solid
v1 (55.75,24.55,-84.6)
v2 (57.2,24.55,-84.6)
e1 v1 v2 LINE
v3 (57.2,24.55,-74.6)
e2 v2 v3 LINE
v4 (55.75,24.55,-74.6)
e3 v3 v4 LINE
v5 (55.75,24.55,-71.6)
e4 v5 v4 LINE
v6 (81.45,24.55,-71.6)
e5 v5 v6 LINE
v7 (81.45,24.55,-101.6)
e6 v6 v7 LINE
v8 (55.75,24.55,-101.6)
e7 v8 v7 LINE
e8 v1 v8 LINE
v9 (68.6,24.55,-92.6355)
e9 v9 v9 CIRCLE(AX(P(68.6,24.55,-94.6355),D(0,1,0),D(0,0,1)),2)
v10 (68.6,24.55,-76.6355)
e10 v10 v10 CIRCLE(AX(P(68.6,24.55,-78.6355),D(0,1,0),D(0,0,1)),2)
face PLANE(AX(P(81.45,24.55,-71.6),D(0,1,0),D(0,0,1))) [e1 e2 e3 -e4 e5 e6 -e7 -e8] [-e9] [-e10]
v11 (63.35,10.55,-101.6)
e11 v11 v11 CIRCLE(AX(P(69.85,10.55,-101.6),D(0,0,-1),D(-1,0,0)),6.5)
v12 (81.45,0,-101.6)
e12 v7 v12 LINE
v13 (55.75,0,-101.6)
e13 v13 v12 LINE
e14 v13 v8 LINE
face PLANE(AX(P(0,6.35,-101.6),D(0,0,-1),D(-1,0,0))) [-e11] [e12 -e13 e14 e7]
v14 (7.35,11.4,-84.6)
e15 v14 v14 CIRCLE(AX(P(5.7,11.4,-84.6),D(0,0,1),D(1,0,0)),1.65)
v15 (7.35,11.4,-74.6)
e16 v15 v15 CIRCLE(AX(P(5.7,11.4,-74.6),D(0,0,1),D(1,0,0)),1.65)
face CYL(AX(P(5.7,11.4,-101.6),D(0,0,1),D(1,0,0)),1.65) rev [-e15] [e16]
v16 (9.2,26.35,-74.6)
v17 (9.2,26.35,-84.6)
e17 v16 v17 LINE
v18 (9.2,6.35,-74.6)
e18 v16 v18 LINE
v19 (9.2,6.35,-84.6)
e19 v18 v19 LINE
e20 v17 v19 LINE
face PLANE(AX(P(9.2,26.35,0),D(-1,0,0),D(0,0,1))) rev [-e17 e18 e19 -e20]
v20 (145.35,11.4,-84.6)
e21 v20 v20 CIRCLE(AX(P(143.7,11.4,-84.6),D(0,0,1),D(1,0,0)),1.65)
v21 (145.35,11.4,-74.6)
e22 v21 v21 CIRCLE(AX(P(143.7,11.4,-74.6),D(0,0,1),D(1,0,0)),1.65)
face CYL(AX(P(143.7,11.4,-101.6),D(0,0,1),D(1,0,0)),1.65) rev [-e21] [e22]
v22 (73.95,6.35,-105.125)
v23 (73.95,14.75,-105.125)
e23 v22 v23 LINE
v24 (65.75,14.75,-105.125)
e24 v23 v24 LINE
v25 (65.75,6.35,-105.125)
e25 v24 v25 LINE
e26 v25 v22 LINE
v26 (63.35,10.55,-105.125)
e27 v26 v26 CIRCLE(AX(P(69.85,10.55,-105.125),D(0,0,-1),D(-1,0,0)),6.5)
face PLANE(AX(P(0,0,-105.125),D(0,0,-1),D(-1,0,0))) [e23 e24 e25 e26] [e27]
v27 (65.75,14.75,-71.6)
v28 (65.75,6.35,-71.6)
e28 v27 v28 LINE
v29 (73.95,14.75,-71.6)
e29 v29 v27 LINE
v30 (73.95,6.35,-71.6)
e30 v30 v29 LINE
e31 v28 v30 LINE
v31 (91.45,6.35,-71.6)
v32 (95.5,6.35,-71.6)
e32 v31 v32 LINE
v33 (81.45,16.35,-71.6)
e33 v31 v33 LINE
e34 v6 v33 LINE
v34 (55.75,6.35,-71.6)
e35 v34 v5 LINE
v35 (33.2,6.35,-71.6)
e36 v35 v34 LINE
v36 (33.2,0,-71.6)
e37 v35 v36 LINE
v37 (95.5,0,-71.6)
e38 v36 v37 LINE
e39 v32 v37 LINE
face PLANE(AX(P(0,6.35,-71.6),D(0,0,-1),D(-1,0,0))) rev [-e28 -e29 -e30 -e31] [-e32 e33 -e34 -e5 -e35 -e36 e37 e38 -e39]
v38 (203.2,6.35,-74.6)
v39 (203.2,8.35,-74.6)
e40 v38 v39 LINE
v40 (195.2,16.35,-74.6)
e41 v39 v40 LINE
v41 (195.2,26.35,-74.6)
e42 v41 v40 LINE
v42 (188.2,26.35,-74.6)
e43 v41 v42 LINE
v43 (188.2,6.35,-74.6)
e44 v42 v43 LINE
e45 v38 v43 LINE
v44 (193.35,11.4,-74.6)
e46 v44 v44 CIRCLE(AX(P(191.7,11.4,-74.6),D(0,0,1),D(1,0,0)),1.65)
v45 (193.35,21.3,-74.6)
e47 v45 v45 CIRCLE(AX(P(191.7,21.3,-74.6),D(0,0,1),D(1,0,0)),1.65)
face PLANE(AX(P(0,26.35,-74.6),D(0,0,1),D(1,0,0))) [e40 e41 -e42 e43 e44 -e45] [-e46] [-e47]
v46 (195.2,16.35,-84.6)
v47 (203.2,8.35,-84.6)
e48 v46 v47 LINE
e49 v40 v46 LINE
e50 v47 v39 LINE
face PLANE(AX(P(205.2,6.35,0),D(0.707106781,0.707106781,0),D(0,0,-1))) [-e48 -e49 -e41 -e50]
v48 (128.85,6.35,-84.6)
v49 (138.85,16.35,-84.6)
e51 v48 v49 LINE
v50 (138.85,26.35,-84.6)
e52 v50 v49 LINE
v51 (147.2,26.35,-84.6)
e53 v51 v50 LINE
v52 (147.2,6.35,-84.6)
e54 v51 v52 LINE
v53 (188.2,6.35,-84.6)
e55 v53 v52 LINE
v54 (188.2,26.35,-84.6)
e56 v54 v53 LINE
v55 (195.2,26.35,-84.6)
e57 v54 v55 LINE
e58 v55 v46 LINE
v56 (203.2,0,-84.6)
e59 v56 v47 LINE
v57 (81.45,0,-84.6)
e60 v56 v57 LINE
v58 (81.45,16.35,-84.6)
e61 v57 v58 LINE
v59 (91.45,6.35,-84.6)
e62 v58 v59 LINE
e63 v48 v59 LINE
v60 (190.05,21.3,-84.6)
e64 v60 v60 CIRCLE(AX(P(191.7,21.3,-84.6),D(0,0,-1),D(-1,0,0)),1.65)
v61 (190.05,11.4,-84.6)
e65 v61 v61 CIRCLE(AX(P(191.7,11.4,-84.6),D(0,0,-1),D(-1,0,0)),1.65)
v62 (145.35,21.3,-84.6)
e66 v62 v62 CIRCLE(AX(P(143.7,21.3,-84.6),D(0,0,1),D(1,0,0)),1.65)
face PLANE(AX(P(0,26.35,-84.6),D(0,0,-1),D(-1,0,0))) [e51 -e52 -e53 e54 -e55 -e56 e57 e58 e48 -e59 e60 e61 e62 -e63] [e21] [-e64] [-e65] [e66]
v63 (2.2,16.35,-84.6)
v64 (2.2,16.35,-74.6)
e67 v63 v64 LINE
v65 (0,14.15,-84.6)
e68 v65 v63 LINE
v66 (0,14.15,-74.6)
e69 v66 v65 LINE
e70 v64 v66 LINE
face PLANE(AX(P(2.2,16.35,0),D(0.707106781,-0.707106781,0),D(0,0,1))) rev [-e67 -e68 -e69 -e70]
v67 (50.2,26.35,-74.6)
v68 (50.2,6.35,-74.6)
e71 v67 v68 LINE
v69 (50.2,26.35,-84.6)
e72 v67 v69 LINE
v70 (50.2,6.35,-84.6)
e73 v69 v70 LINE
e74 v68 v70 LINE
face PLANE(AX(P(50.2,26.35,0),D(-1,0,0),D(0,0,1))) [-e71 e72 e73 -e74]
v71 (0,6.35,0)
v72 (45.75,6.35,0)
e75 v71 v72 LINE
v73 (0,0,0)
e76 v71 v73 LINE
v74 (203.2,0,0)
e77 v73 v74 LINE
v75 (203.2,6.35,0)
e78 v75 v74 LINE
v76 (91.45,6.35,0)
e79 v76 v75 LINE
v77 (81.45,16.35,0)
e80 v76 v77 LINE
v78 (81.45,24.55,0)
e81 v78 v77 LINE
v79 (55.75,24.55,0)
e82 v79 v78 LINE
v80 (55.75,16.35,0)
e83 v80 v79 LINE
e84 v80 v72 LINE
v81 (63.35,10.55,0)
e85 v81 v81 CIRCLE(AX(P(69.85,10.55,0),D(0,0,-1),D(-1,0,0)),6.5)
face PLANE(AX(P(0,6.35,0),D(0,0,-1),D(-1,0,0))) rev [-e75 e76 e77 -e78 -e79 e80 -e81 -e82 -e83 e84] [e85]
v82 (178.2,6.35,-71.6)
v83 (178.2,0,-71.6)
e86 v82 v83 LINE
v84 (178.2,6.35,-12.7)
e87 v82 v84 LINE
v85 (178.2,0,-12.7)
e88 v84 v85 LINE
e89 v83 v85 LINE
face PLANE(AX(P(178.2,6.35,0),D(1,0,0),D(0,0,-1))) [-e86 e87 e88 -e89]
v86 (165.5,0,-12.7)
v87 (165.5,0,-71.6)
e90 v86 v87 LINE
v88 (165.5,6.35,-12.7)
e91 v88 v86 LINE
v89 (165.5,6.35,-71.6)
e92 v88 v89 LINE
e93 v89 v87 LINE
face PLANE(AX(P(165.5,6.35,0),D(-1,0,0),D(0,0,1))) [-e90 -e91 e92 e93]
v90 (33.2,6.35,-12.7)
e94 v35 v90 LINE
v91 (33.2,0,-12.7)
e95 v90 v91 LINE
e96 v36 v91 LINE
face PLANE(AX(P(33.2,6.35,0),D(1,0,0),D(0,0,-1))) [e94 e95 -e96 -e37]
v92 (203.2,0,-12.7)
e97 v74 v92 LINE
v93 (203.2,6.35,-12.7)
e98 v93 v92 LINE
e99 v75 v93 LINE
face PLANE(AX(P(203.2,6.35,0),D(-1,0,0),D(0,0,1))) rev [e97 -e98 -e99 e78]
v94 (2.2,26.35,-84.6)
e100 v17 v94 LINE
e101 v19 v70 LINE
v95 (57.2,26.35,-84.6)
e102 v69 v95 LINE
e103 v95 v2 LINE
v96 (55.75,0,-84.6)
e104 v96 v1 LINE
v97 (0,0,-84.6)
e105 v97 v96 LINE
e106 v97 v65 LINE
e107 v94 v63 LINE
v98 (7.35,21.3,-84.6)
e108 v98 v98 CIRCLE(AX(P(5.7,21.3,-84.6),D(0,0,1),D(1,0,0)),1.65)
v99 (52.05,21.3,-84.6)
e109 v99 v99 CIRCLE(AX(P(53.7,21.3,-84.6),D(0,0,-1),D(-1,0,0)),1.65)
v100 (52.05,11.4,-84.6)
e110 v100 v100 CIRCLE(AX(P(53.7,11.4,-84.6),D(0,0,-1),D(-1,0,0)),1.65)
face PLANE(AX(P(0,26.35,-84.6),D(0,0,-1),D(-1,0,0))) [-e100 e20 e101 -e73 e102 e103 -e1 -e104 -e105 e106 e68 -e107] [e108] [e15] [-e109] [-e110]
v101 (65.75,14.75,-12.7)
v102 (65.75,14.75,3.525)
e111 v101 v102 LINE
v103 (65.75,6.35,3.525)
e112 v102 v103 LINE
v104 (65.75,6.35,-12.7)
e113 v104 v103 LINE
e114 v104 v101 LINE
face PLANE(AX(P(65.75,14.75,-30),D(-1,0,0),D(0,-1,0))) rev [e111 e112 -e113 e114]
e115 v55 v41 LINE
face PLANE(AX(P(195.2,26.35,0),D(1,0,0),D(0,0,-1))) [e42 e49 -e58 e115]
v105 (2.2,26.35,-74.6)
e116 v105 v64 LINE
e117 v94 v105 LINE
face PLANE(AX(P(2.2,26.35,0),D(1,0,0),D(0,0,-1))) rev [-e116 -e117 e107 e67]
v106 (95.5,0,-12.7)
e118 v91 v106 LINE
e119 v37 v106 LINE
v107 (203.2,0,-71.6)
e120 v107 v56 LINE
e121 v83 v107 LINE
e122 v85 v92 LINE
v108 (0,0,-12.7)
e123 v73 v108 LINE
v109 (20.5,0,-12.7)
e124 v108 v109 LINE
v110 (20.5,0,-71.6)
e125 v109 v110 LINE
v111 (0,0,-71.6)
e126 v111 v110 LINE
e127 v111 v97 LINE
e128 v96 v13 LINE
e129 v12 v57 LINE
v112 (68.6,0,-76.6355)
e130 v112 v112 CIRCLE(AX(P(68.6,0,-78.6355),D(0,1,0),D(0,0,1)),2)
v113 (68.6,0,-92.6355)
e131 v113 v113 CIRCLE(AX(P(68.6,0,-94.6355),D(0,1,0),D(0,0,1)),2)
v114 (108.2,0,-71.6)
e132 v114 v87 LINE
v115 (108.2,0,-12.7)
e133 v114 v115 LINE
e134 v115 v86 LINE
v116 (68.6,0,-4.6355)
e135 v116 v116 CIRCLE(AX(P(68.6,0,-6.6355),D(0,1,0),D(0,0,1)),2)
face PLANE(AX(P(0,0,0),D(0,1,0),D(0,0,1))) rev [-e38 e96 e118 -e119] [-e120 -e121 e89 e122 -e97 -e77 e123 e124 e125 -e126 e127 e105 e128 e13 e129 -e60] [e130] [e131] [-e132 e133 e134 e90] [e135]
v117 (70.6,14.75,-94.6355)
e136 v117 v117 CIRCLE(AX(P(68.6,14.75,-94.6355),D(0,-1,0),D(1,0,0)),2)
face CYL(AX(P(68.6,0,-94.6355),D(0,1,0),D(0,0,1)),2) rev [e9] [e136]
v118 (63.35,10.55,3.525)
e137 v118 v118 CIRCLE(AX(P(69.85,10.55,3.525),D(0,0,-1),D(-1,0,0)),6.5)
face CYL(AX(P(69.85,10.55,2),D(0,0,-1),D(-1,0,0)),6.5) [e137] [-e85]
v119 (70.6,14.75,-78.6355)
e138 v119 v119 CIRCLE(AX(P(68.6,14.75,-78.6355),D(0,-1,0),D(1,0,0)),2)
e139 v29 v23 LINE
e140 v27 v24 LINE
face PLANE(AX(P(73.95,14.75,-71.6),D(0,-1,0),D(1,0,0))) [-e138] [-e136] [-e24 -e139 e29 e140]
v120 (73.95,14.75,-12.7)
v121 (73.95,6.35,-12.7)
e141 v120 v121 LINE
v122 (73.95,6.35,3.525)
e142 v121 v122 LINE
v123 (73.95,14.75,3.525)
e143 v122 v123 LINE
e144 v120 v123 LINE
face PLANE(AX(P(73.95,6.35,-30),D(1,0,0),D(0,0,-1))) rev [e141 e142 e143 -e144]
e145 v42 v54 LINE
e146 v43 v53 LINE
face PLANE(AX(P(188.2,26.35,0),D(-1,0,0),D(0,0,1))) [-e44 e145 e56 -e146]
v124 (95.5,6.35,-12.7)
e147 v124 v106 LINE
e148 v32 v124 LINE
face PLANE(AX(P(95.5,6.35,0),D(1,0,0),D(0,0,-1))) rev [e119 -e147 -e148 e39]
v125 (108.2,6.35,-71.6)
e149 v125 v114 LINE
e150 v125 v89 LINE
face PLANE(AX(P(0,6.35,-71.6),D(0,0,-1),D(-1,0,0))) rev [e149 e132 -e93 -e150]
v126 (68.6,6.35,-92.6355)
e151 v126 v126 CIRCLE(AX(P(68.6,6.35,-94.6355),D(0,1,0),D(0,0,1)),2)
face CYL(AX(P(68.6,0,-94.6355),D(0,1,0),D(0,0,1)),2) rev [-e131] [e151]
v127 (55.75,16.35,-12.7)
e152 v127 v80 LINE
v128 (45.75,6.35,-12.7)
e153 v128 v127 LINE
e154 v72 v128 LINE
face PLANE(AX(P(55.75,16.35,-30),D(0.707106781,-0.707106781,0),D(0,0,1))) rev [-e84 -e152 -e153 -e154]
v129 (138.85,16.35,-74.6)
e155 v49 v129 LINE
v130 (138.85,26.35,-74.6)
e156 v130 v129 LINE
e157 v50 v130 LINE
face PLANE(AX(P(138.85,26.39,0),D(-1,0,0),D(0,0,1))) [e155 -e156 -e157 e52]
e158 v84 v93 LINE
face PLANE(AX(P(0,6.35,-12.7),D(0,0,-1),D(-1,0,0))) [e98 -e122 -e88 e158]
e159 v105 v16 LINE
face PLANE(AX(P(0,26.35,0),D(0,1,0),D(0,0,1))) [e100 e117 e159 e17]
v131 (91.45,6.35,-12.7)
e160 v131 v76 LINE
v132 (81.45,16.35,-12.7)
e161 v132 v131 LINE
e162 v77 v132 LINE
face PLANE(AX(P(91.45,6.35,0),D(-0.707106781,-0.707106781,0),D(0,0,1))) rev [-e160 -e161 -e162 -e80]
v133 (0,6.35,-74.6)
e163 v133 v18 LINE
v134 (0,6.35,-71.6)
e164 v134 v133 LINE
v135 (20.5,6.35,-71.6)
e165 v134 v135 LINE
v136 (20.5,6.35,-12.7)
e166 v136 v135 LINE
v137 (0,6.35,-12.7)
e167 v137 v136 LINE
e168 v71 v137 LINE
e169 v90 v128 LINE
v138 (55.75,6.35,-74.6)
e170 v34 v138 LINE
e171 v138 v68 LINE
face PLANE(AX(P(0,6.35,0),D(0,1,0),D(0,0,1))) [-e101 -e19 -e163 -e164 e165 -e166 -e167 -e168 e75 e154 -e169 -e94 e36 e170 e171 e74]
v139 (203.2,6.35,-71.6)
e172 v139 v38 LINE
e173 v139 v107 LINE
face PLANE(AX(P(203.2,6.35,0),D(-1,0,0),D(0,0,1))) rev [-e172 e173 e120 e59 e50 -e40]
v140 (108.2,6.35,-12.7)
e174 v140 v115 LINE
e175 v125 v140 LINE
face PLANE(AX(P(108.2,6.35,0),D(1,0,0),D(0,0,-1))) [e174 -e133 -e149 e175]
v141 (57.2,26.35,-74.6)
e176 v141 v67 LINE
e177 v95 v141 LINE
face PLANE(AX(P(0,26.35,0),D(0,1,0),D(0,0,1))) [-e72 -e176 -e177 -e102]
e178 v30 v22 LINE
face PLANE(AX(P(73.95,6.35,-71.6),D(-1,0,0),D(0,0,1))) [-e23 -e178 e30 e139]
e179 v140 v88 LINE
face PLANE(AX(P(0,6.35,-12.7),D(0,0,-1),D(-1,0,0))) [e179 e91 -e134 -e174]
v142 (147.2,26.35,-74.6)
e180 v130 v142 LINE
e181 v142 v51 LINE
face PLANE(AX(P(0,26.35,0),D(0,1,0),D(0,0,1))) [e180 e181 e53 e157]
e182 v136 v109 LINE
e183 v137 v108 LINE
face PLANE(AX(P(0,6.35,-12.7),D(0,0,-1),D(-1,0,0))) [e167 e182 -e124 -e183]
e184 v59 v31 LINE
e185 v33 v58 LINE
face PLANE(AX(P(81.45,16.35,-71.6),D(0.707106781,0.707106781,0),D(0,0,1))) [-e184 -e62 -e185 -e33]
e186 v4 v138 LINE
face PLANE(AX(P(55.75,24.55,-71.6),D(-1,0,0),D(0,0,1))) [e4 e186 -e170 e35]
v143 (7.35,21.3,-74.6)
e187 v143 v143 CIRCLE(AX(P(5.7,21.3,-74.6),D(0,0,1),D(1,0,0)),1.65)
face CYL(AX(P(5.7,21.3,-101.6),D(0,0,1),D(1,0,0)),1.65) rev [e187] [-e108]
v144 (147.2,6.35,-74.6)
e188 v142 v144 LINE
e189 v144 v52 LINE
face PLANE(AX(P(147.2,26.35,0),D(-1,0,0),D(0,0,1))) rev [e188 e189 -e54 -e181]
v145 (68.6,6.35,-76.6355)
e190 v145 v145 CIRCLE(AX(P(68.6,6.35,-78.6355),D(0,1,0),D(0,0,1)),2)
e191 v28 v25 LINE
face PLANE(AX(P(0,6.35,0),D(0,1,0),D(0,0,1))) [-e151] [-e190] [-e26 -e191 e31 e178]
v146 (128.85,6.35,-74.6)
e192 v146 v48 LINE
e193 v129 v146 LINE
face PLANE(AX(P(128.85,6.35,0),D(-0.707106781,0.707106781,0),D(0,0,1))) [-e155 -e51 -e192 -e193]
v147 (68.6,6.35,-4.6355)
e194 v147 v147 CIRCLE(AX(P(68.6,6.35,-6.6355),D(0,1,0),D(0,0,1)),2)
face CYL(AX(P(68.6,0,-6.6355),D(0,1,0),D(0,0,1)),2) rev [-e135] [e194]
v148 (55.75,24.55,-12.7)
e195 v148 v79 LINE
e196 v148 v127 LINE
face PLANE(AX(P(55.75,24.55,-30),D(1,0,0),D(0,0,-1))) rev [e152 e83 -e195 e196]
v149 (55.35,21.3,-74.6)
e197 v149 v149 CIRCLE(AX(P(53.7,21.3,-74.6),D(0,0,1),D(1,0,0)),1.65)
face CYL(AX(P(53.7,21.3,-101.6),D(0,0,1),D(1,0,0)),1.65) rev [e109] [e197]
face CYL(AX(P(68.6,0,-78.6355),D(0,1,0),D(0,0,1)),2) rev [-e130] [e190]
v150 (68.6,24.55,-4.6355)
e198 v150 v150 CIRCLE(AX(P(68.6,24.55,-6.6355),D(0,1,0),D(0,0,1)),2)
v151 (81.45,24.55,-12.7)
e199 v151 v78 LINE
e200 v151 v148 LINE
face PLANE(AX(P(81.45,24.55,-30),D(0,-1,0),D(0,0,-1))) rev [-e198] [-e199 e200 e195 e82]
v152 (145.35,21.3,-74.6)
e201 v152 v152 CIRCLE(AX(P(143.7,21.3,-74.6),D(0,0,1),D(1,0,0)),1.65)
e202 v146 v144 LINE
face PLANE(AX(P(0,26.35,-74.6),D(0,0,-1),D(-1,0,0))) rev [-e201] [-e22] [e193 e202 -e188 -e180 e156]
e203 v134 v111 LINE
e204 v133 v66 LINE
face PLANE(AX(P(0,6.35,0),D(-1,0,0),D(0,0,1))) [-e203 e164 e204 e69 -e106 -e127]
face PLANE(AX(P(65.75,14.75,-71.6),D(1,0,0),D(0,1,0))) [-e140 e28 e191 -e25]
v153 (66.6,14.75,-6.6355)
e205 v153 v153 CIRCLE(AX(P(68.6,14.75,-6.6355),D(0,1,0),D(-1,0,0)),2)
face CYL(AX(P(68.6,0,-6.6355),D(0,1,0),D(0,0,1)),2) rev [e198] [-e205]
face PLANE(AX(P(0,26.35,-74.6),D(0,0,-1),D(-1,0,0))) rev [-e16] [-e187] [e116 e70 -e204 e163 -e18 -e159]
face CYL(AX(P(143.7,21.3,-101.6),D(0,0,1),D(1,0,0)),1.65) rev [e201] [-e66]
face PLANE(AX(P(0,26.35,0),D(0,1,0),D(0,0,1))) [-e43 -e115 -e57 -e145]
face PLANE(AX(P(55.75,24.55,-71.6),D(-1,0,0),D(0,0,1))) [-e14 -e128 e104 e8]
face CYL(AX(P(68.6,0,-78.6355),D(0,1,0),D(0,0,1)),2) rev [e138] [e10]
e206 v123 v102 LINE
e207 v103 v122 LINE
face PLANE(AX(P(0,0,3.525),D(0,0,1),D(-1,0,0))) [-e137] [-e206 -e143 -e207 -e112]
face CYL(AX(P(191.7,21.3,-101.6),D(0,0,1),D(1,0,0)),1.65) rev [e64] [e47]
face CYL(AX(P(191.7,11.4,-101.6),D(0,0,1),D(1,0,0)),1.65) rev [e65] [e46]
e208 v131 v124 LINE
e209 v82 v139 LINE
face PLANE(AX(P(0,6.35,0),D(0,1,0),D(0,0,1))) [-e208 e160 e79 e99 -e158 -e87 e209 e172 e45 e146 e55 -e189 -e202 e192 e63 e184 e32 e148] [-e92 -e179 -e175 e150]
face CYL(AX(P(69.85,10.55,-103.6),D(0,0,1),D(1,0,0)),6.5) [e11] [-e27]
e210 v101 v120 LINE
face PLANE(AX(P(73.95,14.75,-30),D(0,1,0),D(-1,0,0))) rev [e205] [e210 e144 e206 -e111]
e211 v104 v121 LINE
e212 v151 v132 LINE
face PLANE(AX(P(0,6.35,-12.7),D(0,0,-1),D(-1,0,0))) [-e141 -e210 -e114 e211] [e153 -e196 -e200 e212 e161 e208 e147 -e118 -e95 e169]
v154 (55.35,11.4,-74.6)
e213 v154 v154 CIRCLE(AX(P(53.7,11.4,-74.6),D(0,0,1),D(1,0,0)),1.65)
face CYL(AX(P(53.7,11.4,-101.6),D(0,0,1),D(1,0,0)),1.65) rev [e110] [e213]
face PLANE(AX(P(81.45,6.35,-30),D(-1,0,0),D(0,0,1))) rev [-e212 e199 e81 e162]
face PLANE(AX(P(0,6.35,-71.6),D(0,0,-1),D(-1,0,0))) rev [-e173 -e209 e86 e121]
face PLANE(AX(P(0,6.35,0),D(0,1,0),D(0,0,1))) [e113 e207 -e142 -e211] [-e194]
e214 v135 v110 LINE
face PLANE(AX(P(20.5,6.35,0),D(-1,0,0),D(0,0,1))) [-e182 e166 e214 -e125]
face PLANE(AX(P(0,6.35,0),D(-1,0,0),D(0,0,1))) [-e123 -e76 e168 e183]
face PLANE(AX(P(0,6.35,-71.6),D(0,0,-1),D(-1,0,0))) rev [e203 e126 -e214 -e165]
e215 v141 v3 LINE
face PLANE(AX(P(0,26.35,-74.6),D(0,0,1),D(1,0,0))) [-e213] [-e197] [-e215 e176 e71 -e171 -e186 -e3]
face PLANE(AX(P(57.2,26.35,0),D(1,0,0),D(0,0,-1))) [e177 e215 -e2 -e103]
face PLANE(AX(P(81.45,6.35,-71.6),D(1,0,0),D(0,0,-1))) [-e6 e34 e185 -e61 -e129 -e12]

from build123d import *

# Parameters (mm, degrees)
SKETCH1_W           = 12.7
SKETCH1_H           = 58.9
BOSS_EXTRUDE1_DEPTH = 6.35
SKETCH6_W           = 16.7
SKETCH6_H           = 10
SKETCH6_W_2         = 7
SKETCH6_W_3         = 8.35
BOSS_EXTRUDE5_DEPTH = 20
FILLET6_SIZE        = 8
FILLET6_SIZE_2      = 20
SKETCH7_R           = 1.65
CUT_EXTRUDE1_DEPTH  = 219.058988591
BOSS_EXTRUDE6_DEPTH = 30
SKETCH10_W          = 25.7
SKETCH10_H          = 17.3
CUT_EXTRUDE2_DEPTH  = 229.063149203
SKETCH11_R          = 6.5
SKETCH11_W          = 8.2
SKETCH11_H          = 8.4
BOSS_EXTRUDE7_DEPTH = 2
SKETCH12_R          = 6.5
SKETCH12_W          = 8.2
SKETCH12_H          = 8.4
BOSS_EXTRUDE8_DEPTH = 1.525
SKETCH14_W          = 8.05
SKETCH14_H          = 18
SKETCH14_W_2        = 8.35
SKETCH14_H_2        = 10
CUT_EXTRUDE4_DEPTH  = 230.655188552
CUT_EXTRUDE5_DEPTH  = 230.655188544
SKETCH17_R          = 2
CUT_EXTRUDE6_DEPTH  = 231.096084549
CHAMFER1_SIZE       = 10


with BuildPart() as part:
    # Sketch1 → Boss-Extrude1 (new body)
    with BuildSketch(Plane(origin=(0, 0, 0), x_dir=(1, 0, 0), z_dir=(0, 1, 0))):
        Polygon((0, 101.6), (0, 71.6), (20.5, 71.6), (33.2, 71.6), (95.5, 71.6), (108.2, 71.6), (165.5, 71.6), (178.2, 71.6), (203.2, 71.6), (203.2, 101.6), align=None)
        with Locations((26.85, 42.15)):
            Rectangle(SKETCH1_W, SKETCH1_H)
        with Locations((101.85, 42.15)):
            Rectangle(SKETCH1_W, SKETCH1_H)
        with Locations((171.85, 42.15)):
            Rectangle(SKETCH1_W, SKETCH1_H)
        Polygon((20.5, 12.7), (0, 12.7), (0, 0), (203.2, 0), (203.2, 12.7), (178.2, 12.7), (165.5, 12.7), (108.2, 12.7), (95.5, 12.7), (33.2, 12.7), align=None)
    extrude(amount=BOSS_EXTRUDE1_DEPTH)

    # Sketch6 → Boss-Extrude5 (add)
    with BuildSketch(Plane(origin=(0, 6.35, 0), x_dir=(1, 0, 0), z_dir=(0, 1, 0))):
        with Locations((138.85, 79.6)):
            Rectangle(SKETCH6_W, SKETCH6_H)
        with Locations((191.7, 79.6)):
            Rectangle(SKETCH6_W_2, SKETCH6_H)
        with Locations((134.675, 79.6)):
            Rectangle(SKETCH6_W_3, SKETCH6_H)
        with Locations((86, 79.6)):
            Rectangle(SKETCH6_W_2, SKETCH6_H)
        with Locations((53.7, 79.6)):
            Rectangle(SKETCH6_W_2, SKETCH6_H)
        with Locations((5.7, 79.6)):
            Rectangle(SKETCH6_W_2, SKETCH6_H)
    extrude(amount=BOSS_EXTRUDE5_DEPTH)

    # Fillet6
    # an asymmetric fillet: 20, 8 mm, written as the material it adds along each edge
    with BuildSketch(Plane(origin=(82.5, 6.35, -84.6), x_dir=(-1, 0, 0), z_dir=(0, 0, 1))) as fillet6_piece_1:
        with BuildLine():
            Bezier((FILLET6_SIZE, 0), (0, 0), (0, -FILLET6_SIZE_2), weights=[1, 0.707106781, 1])
            Line((0, -FILLET6_SIZE_2), (-0.4, -20))
            Line((-0.4, -20), (-0.4, 0.4))
            Line((-0.4, 0.4), (8, 0.4))
            Line((8, 0.4), (FILLET6_SIZE, 0))
        make_face()
    extrude(amount=10)
    with BuildSketch(Plane(origin=(89.5, 6.35, -84.6), x_dir=(0, 0, -1), z_dir=(-1, 0, 0))) as fillet6_piece_2:
        with BuildLine():
            Bezier((FILLET6_SIZE, 0), (0, 0), (0, -FILLET6_SIZE_2), weights=[1, 0.707106781, 1])
            Line((0, -FILLET6_SIZE_2), (-0.4, -20))
            Line((-0.4, -20), (-0.4, 0.4))
            Line((-0.4, 0.4), (8, 0.4))
            Line((8, 0.4), (FILLET6_SIZE, 0))
        make_face()
    extrude(amount=7)
    with BuildSketch(Plane(origin=(89.5, 6.35, -84.6), x_dir=(0, 0, -1), z_dir=(-1, 0, 0))) as fillet6_piece_3a_section:
        with BuildLine():
            Bezier((FILLET6_SIZE, 0), (0, 0), (0, -FILLET6_SIZE_2), weights=[1, 0.707106781, 1])
            Line((0, -FILLET6_SIZE_2), (-0.4, -20))
            Line((-0.4, -20), (-0.4, 0.4))
            Line((-0.4, 0.4), (8, 0.4))
            Line((8, 0.4), (FILLET6_SIZE, 0))
        make_face()
    fillet6_piece_3a = extrude(amount=57, mode=Mode.PRIVATE)
    fillet6_piece_3a = split(fillet6_piece_3a, bisect_by=Plane(origin=(82.5, 11.442766382, -86.187108648), z_dir=(-1, 0, 0)), keep=Keep.TOP, mode=Mode.PRIVATE)
    with BuildSketch(Plane(origin=(82.5, 6.35, -134.6), x_dir=(-1, 0, 0), z_dir=(0, 0, 1))) as fillet6_piece_3b_section:
        with BuildLine():
            Bezier((FILLET6_SIZE, 0), (0, 0), (0, -FILLET6_SIZE_2), weights=[1, 0.707106781, 1])
            Line((0, -FILLET6_SIZE_2), (-0.4, -20))
            Line((-0.4, -20), (-0.4, 0.4))
            Line((-0.4, 0.4), (8, 0.4))
            Line((8, 0.4), (FILLET6_SIZE, 0))
        make_face()
    fillet6_piece_3b = extrude(amount=60, mode=Mode.PRIVATE)
    fillet6_piece_3b = split(fillet6_piece_3b, bisect_by=Plane(origin=(80.912890407, 11.442765861, -84.6), z_dir=(0, 0, -1)), keep=Keep.TOP, mode=Mode.PRIVATE)
    fillet6_piece_3 = fillet6_piece_3a & fillet6_piece_3b
    add(fillet6_piece_3)

    # Sketch7 → Cut-Extrude1 (cut, through all)
    with BuildSketch(Plane.XY.offset(-74.6)):
        with Locations((191.7, 21.3)):
            Circle(SKETCH7_R)
        with Locations((191.7, 11.4)):
            Circle(SKETCH7_R)
        with Locations((143.7, 11.4)):
            Circle(SKETCH7_R)
        with Locations((143.7, 21.3)):
            Circle(SKETCH7_R)
        with Locations((86, 21.3)):
            Circle(SKETCH7_R)
        with Locations((86, 11.4)):
            Circle(SKETCH7_R)
        with Locations((134, 21.3)):
            Circle(SKETCH7_R)
        with Locations((134, 11.4)):
            Circle(SKETCH7_R)
        with Locations((5.7, 21.3)):
            Circle(SKETCH7_R)
        with Locations((5.7, 11.4)):
            Circle(SKETCH7_R)
        with Locations((53.7, 11.4)):
            Circle(SKETCH7_R)
        with Locations((53.7, 21.3)):
            Circle(SKETCH7_R)
    extrude(amount=-CUT_EXTRUDE1_DEPTH, mode=Mode.SUBTRACT)

    # Sketch9 → Boss-Extrude6 (add)
    with BuildSketch(Plane(origin=(0, 0, -101.6), x_dir=(-1, 0, 0), z_dir=(0, 0, -1))):
        Polygon((-73.95, 6.35), (-73.95, 14.75), (-65.75, 14.75), (-65.75, 6.35), (-55.75, 6.35), (-55.75, 24.55), (-81.45, 24.55), (-81.45, 6.35), align=None)
    boss_extrude6 = extrude(amount=-BOSS_EXTRUDE6_DEPTH)

    # Mirror1: Boss-Extrude6 across plane
    add(boss_extrude6.mirror(Plane(origin=(0, 0, -50.8), x_dir=(1, 0, 0), z_dir=(0, 0, -1))))

    # Sketch10 → Cut-Extrude2 (cut, through all)
    with BuildSketch(Plane(origin=(0, 6.35, 0), x_dir=(-1, 0, 0), z_dir=(0, -1, 0))):
        with Locations((-68.6, 21.35)):
            Rectangle(SKETCH10_W, SKETCH10_H)
    extrude(amount=-CUT_EXTRUDE2_DEPTH, mode=Mode.SUBTRACT)

    # Sketch11 → Boss-Extrude7 (add)
    with BuildSketch(Plane(origin=(0, 0, -101.6), x_dir=(-1, 0, 0), z_dir=(0, 0, -1))):
        with Locations((-69.85, 10.55)):
            Circle(SKETCH11_R)
        with Locations((-69.85, 10.55)):
            Rectangle(SKETCH11_W, SKETCH11_H, mode=Mode.SUBTRACT)
    boss_extrude7 = extrude(amount=BOSS_EXTRUDE7_DEPTH)

    # Sketch12 → Boss-Extrude8 (add)
    with BuildSketch(Plane(origin=(0, 0, -103.6), x_dir=(-1, 0, 0), z_dir=(0, 0, -1))):
        with Locations((-69.85, 10.55)):
            Circle(SKETCH12_R)
        with Locations((-69.85, 10.55)):
            Rectangle(SKETCH12_W, SKETCH12_H, mode=Mode.SUBTRACT)
    boss_extrude8 = extrude(amount=BOSS_EXTRUDE8_DEPTH)

    # Mirror2: Boss-Extrude7, Boss-Extrude8 across plane
    add(boss_extrude7.mirror(Plane(origin=(0, 0, -50.8), x_dir=(1, 0, 0), z_dir=(0, 0, -1))))
    add(boss_extrude8.mirror(Plane(origin=(0, 0, -50.8), x_dir=(1, 0, 0), z_dir=(0, 0, -1))))

    # Sketch14 → Cut-Extrude4 (cut, through all)
    with BuildSketch(Plane(origin=(0, 6.35, 0), x_dir=(1, 0, 0), z_dir=(0, 1, 0))):
        with Locations((85.475, 83.6)):
            Rectangle(SKETCH14_W, SKETCH14_H)
        with Locations((134.675, 79.6)):
            Rectangle(SKETCH14_W_2, SKETCH14_H_2)
    extrude(amount=CUT_EXTRUDE4_DEPTH, mode=Mode.SUBTRACT)

    # Sketch15 → Cut-Extrude5 (cut, through all)
    with BuildSketch(Plane(origin=(0, 6.35, 0), x_dir=(1, 0, 0), z_dir=(0, 1, 0))):
        Polygon((188.2, 84.6), (195.2, 84.6), (203.2, 84.6), (203.2, 101.6), (81.45, 101.6), (81.45, 84.6), (138.85, 84.6), (147.2, 84.6), align=None)
        Polygon((0, 101.6), (0, 84.6), (57.2, 84.6), (55.75, 84.6), (55.75, 101.6), align=None)
    extrude(amount=-CUT_EXTRUDE5_DEPTH, mode=Mode.SUBTRACT)

    # Sketch17 → Cut-Extrude6 (cut, through all)
    with BuildSketch(Plane(origin=(0, 24.55, 0), x_dir=(1, 0, 0), z_dir=(0, 1, 0))):
        with Locations(Location((68.6, 6.6355, 0), (0, 0, 270))):
            Circle(SKETCH17_R)
        with Locations(Location((68.6, 78.6355, 0), (0, 0, 270))):
            Circle(SKETCH17_R)
        with Locations(Location((68.6, 94.6355, 0), (0, 0, 270))):
            Circle(SKETCH17_R)
    extrude(amount=-CUT_EXTRUDE6_DEPTH, mode=Mode.SUBTRACT)

    # Chamfer1
    # the kernel refuses this chamfer: 10 mm, written as the material it adds along each edge
    with BuildSketch(Plane(origin=(2.2, 6.35, -84.6), x_dir=(-0.9996219169112968, -0.027495876610586386, 0), z_dir=(0, 0, 1))) as chamfer1_piece_1_section:
        Polygon((CHAMFER1_SIZE * 0.999621916911, -CHAMFER1_SIZE * 0.0274958766106), (-CHAMFER1_SIZE * 0.0274958766106, -CHAMFER1_SIZE * 0.999621916911), (0, 0), align=None)
    chamfer1_piece_1 = extrude(amount=10, mode=Mode.PRIVATE)
    chamfer1_piece_1 = split(chamfer1_piece_1, bisect_by=Plane(origin=(0, 10.91513357, -79.6), z_dir=(1, 0, 0)), keep=Keep.TOP, mode=Mode.PRIVATE)
    add(chamfer1_piece_1)
    with BuildSketch(Plane(origin=(81.45, 6.35, -71.6), x_dir=(-0.027495876610586313, 0.9996219169112968, 0), z_dir=(0, 0, -1))) as chamfer1_piece_2:
        Polygon((CHAMFER1_SIZE * 0.999621916911, CHAMFER1_SIZE * 0.0274958766106), (-CHAMFER1_SIZE * 0.0274958766106, CHAMFER1_SIZE * 0.999621916911), (0, 0), align=None)
    extrude(amount=13)
    with BuildSketch(Plane(origin=(81.45, 6.35, 0), x_dir=(0.9996219169112968, -0.027495876610586403, 0), z_dir=(0, 0, -1))) as chamfer1_piece_3:
        Polygon((CHAMFER1_SIZE * 0.999621916911, -CHAMFER1_SIZE * 0.0274958766106), (-CHAMFER1_SIZE * 0.0274958766106, -CHAMFER1_SIZE * 0.999621916911), (0, 0), align=None)
    extrude(amount=12.7)
    with BuildSketch(Plane(origin=(55.75, 6.35, 0), x_dir=(-0.9996219169112968, -0.027495876610586403, 0), z_dir=(0, 0, -1))) as chamfer1_piece_4:
        Polygon((CHAMFER1_SIZE * 0.999621916911, CHAMFER1_SIZE * 0.0274958766106), (-CHAMFER1_SIZE * 0.0274958766106, CHAMFER1_SIZE * 0.999621916911), (0, 0), align=None)
    extrude(amount=12.7)
    with BuildSketch(Plane(origin=(138.85, 6.35, -74.6), x_dir=(-0.9996219169112968, -0.027495876610586365, 0), z_dir=(0, 0, -1))) as chamfer1_piece_5:
        Polygon((CHAMFER1_SIZE * 0.999621916911, CHAMFER1_SIZE * 0.0274958766106), (-CHAMFER1_SIZE * 0.0274958766106, CHAMFER1_SIZE * 0.999621916911), (0, 0), align=None)
    extrude(amount=10)
    with BuildSketch(Plane(origin=(195.2, 6.35, -74.6), x_dir=(0.9996219169112968, -0.027495876610586365, 0), z_dir=(0, 0, -1))) as chamfer1_piece_6_section:
        Polygon((CHAMFER1_SIZE * 0.999621916911, -CHAMFER1_SIZE * 0.0274958766106), (-CHAMFER1_SIZE * 0.0274958766106, -CHAMFER1_SIZE * 0.999621916911), (0, 0), align=None)
    chamfer1_piece_6 = extrude(amount=10, mode=Mode.PRIVATE)
    chamfer1_piece_6 = split(chamfer1_piece_6, bisect_by=Plane(origin=(203.2, 9.807184123, -79.6), z_dir=(-1, 0, 0)), keep=Keep.TOP, mode=Mode.PRIVATE)
    add(chamfer1_piece_6)


solid = part.part
